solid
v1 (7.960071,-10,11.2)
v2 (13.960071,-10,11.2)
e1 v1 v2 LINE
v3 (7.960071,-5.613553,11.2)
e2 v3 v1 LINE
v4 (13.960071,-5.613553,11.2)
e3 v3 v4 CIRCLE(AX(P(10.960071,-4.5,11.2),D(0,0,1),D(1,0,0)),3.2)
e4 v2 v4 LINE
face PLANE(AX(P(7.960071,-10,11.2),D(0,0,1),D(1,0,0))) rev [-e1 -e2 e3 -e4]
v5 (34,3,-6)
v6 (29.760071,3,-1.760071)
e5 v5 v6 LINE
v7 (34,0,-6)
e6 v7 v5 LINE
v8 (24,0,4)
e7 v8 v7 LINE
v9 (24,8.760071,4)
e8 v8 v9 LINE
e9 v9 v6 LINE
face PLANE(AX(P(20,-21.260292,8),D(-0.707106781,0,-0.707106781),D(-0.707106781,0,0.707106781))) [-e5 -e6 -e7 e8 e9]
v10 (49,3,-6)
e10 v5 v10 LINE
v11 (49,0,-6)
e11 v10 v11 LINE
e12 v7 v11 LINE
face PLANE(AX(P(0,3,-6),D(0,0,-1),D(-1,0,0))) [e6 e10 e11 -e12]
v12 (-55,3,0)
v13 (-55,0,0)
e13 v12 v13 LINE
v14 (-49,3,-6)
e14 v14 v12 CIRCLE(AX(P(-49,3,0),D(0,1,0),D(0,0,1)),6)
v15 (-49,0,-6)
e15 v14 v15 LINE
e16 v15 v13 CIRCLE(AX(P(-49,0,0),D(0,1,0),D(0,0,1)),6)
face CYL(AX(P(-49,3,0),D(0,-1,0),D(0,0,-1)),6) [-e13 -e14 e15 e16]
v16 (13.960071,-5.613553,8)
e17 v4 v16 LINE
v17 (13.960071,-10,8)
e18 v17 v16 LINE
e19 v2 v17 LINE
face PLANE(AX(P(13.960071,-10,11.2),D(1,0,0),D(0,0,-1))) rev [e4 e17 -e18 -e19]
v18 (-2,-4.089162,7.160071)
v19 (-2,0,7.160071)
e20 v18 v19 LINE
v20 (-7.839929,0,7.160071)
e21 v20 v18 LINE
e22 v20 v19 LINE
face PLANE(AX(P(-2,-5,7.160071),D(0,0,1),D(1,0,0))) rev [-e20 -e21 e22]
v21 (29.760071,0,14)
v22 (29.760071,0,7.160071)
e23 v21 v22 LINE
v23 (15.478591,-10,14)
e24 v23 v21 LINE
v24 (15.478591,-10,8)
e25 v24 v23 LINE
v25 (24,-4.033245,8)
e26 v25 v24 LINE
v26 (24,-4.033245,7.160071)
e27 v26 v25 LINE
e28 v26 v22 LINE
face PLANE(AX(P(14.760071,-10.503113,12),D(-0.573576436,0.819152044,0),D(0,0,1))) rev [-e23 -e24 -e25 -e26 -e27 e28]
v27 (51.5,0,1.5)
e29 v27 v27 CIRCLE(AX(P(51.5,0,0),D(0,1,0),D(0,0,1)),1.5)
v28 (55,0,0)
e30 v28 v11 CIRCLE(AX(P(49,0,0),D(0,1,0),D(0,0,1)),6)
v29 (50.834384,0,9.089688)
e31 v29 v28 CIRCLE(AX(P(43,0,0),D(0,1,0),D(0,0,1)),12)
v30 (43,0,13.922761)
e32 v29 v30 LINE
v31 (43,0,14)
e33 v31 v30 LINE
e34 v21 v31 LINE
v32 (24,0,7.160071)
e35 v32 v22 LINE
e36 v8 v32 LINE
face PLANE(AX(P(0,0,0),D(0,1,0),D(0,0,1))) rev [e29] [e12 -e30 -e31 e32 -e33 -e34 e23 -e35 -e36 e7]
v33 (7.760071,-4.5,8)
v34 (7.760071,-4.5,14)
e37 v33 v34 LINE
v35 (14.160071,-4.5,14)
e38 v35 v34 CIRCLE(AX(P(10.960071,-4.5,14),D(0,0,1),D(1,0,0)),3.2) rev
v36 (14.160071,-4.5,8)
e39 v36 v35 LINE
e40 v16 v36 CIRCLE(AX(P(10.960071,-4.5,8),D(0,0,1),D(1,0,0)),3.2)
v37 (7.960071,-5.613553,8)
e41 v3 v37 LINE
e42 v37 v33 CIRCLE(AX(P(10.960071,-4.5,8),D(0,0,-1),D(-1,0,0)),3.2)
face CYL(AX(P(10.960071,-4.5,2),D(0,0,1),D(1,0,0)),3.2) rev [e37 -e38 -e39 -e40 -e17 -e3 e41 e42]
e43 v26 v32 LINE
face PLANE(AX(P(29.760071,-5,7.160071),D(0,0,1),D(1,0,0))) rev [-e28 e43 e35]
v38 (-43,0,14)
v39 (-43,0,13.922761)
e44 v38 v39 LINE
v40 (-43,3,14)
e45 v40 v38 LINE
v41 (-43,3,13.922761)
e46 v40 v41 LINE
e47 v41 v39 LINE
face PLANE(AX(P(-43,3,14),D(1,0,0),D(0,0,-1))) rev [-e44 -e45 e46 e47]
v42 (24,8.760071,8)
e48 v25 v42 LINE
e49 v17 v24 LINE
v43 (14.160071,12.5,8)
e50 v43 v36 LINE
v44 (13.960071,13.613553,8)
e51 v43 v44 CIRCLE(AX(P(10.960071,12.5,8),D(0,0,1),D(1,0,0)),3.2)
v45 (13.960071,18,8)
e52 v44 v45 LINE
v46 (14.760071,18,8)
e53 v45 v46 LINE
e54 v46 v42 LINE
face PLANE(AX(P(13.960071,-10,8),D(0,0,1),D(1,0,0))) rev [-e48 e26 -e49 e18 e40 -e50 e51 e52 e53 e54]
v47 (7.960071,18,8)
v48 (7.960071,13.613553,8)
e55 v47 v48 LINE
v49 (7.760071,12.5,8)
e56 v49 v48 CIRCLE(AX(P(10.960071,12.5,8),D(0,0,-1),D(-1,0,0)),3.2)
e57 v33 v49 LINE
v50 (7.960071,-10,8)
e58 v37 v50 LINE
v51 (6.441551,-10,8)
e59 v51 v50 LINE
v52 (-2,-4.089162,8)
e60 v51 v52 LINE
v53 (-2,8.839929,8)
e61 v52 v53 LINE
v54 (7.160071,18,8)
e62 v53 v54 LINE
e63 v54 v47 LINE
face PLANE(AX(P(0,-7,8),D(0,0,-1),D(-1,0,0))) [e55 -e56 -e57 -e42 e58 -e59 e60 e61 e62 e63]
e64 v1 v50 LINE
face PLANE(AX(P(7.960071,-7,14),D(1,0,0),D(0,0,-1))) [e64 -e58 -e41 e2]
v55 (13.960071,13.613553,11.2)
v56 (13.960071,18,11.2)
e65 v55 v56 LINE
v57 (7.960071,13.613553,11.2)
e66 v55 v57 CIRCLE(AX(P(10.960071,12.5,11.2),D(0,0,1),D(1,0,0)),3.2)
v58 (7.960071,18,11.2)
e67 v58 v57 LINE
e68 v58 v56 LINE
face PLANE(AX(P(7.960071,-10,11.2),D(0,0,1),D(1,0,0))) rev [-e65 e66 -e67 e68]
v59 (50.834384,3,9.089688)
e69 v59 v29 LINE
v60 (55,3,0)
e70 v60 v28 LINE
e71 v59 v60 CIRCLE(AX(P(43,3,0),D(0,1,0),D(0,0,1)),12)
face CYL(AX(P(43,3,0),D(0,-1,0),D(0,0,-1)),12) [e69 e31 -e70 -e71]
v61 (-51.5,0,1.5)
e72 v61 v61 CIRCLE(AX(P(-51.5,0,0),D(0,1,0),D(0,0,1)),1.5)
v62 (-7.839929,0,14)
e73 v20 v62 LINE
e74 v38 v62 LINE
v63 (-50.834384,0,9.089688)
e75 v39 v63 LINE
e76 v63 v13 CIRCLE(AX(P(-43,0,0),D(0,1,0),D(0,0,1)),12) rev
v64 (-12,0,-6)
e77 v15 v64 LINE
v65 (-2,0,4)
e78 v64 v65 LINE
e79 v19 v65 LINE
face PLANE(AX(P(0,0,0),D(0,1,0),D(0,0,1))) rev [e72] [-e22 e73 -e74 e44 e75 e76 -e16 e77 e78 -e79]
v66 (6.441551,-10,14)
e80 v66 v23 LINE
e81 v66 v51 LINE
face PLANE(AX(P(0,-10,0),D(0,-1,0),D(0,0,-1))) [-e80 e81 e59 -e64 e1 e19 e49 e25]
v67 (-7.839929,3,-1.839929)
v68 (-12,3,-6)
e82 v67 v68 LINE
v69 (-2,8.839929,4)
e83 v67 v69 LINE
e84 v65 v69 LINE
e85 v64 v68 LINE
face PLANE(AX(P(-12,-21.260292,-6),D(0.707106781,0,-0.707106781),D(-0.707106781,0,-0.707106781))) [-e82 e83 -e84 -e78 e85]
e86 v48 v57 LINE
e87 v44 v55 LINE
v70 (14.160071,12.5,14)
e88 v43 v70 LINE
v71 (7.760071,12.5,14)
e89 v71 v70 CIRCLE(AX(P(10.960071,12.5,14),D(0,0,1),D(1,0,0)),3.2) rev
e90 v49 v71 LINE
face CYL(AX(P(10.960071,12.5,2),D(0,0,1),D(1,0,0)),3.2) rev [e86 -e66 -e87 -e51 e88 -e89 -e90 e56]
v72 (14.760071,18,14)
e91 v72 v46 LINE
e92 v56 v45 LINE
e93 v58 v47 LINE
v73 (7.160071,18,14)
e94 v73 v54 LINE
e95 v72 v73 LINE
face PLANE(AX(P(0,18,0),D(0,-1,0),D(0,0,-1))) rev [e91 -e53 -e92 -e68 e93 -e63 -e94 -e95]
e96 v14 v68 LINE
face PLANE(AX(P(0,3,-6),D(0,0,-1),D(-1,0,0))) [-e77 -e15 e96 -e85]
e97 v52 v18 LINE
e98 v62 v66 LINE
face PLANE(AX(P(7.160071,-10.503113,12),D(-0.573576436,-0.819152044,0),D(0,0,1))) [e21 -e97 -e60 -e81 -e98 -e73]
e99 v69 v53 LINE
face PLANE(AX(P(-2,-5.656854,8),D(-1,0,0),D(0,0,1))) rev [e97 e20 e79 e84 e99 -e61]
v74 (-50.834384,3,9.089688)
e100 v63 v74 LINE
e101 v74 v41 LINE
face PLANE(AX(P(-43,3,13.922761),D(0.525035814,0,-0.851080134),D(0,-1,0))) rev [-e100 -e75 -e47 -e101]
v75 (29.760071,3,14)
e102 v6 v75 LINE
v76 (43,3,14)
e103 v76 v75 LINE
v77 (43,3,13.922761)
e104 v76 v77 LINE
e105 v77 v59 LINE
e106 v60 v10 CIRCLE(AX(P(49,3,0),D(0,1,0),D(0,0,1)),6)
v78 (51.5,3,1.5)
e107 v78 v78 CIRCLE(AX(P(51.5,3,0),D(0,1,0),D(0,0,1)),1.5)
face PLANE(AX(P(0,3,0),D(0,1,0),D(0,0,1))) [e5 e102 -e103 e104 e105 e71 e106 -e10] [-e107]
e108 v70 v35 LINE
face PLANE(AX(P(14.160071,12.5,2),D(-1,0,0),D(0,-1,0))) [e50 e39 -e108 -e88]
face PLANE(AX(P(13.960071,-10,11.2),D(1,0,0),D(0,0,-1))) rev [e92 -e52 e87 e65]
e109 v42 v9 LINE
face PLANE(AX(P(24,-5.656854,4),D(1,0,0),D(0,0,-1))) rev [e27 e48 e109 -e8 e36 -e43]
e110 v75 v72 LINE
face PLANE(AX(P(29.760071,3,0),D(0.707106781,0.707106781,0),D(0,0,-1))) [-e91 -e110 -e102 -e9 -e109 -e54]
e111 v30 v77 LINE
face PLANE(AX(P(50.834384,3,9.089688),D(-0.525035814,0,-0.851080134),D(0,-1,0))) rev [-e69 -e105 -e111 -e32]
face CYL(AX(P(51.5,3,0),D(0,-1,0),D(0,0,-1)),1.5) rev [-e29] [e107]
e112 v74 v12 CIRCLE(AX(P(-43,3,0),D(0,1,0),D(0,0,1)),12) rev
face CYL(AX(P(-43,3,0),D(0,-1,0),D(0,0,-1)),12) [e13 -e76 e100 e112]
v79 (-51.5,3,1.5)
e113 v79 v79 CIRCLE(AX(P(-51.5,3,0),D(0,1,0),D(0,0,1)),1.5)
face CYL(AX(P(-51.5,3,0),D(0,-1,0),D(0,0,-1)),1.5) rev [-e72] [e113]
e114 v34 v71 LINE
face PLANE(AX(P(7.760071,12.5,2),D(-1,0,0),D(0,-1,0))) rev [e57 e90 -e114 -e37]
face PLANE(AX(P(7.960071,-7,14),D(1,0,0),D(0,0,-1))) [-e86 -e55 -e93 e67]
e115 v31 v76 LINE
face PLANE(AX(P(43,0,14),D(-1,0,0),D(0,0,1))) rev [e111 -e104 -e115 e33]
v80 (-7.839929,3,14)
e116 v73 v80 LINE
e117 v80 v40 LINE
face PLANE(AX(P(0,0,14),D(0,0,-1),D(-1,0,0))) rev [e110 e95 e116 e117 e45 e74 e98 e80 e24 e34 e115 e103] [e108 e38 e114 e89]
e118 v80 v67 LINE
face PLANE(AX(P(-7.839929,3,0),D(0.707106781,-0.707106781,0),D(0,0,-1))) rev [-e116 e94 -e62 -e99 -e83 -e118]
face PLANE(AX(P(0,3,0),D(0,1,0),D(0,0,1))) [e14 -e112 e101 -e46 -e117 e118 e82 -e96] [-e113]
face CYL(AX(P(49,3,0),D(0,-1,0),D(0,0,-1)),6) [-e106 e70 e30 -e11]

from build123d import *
from build123d.topology import SkipClean

# Parameters (mm, degrees)
BOSS_EXTRUDE1_DEPTH = 3
CUT_EXTRUDE1_DEPTH  = 10
CUT_EXTRUDE3_START  = 8
SKETCH8_W           = 6
SKETCH8_H           = 3
CUT_EXTRUDE3_DEPTH  = 6
BOSS_EXTRUDE4_START = 18
BOSS_EXTRUDE4_DEPTH = 28
BOSS_EXTRUDE5_DEPTH = 3
CUT_EXTRUDE4_DEPTH  = 3
CHAMFER1_SIZE       = 15
CHAMFER2_SIZE       = 15
CHAMFER2_SIZE_2     = 10.503113073
CUT_EXTRUDE5_DEPTH  = 10
CUT_EXTRUDE6_DEPTH  = 5
BOSS_EXTRUDE8_DEPTH = 2
CHAMFER3_DEPTH      = 4
CHAMFER3_2_DEPTH    = 3


with BuildPart() as part:
    # Sketch1 → Boss-Extrude1 (new body)
    with BuildSketch(Plane(origin=(0, 0, 0), x_dir=(1, 0, 0), z_dir=(0, 1, 0))):
        with BuildLine():
            ThreePointArc((-49, -6), (-53.242640687, -4.242640687), (-55, 0))
            ThreePointArc((-55, 0), (-51.485281374, -8.485281374), (-43, -12))
            Line((-43, -12), (43, -12))
            ThreePointArc((43, -12), (51.485281374, -8.485281374), (55, 0))
            ThreePointArc((55, 0), (53.242640687, -4.242640687), (49, -6))
            Line((49, -6), (-49, -6))
        make_face()
        with BuildLine():
            Line((-53, 0), (-55, 0))
            ThreePointArc((-55, 0), (-53.242640687, -4.242640687), (-49, -6))
            Line((-49, -6), (49, -6))
            ThreePointArc((49, -6), (53.242640687, -4.242640687), (55, 0))
            Line((55, 0), (53, 0))
            ThreePointArc((53, 0), (51.5, -1.5), (50, 0))
            Line((50, 0), (-50, 0))
            ThreePointArc((-50, 0), (-51.5, -1.5), (-53, 0))
        make_face()
        with BuildLine():
            Line((49, 6), (-49, 6))
            ThreePointArc((-49, 6), (-53.242640687, 4.242640687), (-55, 0))
            Line((-55, 0), (-53, 0))
            ThreePointArc((-53, 0), (-51.5, 1.5), (-50, 0))
            Line((-50, 0), (50, 0))
            ThreePointArc((50, 0), (51.5, 1.5), (53, 0))
            Line((53, 0), (55, 0))
            ThreePointArc((55, 0), (53.242640687, 4.242640687), (49, 6))
        make_face()
    extrude(amount=BOSS_EXTRUDE1_DEPTH)

    # Sketch2 → Cut-Extrude1 (cut)
    with BuildSketch(Plane(origin=(0, 3, 0), x_dir=(1, 0, 0), z_dir=(0, 1, 0))):
        Polygon((22, -8), (36, 6), (-14, 6), (0, -8), align=None)
    extrude(amount=-CUT_EXTRUDE1_DEPTH, mode=Mode.SUBTRACT)

    # Sketch8 → Cut-Extrude3 (cut)
    with BuildSketch(Plane.XY.offset(CUT_EXTRUDE3_START)):
        with Locations((10.960071178, 1.5)):
            Rectangle(SKETCH8_W, SKETCH8_H)
    extrude(amount=CUT_EXTRUDE3_DEPTH, mode=Mode.SUBTRACT)


with BuildPart() as cut_extrude3_piece_1:
    # of the separate pieces the step leaves, piece 1, a body of its own (cut_extrude3_pieces)
    add(part.part.solids().sort_by_distance((-55, 0, 0))[0])

    # Sketch9 → Boss-Extrude4 (add)
    with BuildSketch(Plane(origin=(0, 0, 0), x_dir=(1, 0, 0), z_dir=(0, 1, 0)).offset(BOSS_EXTRUDE4_START)):
        Polygon((13.960071178, -11.2), (13.960071178, -8), (14.760071178, -8), (14.760071178, -12), (7.160071178, -12), (7.160071178, -8), (7.960071178, -8), (7.960071178, -11.2), align=None)
    extrude(amount=-BOSS_EXTRUDE4_DEPTH)


with BuildPart() as cut_extrude3_piece_2:
    # of the separate pieces the step leaves, piece 2, a body of its own (cut_extrude3_pieces)
    add(part.part.solids().sort_by_distance((13.960071178, 0, 12))[0])


with BuildPart() as cut_extrude3_piece_1_1:
    add(cut_extrude3_piece_1.part)

    # Combine1: union Cut-Extrude3 piece 2
    add(cut_extrude3_piece_2.part)

    # Sketch11 → Boss-Extrude5 (add)
    with BuildSketch(Plane(origin=(0, 3, 0), x_dir=(1, 0, 0), z_dir=(0, 1, 0))):
        Polygon((-14, 6), (-12, 6), (2, -8), (0, -8), align=None)
        Polygon((20, -8), (34, 6), (36, 6), (22, -8), align=None)
    extrude(amount=-BOSS_EXTRUDE5_DEPTH)

    # Sketch13 → Cut-Extrude4 (cut)
    with BuildSketch(Plane(origin=(0, 3, 0), x_dir=(1, 0, 0), z_dir=(0, 1, 0))):
        Polygon((2, -8), (-2, -8), (-2, -4), align=None)
        Polygon((24, -4), (24, -8), (20, -8), align=None)
    extrude(amount=-CUT_EXTRUDE4_DEPTH, mode=Mode.SUBTRACT)

    # Chamfer1
    chamfer1_edges = [cut_extrude3_piece_1_1.edges().sort_by_distance(p)[0] for p in [
        (14.760071178, 3, 10),
        (7.160071178, 3, 10),
    ]]
    chamfer(chamfer1_edges, length=CHAMFER1_SIZE - 0.0001)  # a hair under: the kernel refuses the full size

    # Chamfer2
    # the kernel refuses this chamfer: 15, 10.503113073 mm, written as the material it adds along each edge
    with BuildSketch(Plane(origin=(7.160071178, 0, 12), x_dir=(-1, 0, 0), z_dir=(0, 0, -1))) as chamfer2_piece_1_section:
        Polygon((CHAMFER2_SIZE, 0), (0, -CHAMFER2_SIZE_2), (0, 0), align=None)
    chamfer2_piece_1 = extrude(amount=4, mode=Mode.PRIVATE)
    chamfer2_piece_1 = split(chamfer2_piece_1, bisect_by=Plane(origin=(-2, 0, 12), z_dir=(-1, 0, 0)), keep=Keep.TOP, mode=Mode.PRIVATE)
    add(chamfer2_piece_1)
    with BuildSketch(Plane(origin=(7.160071178, 0, 12), x_dir=(-1, 0, 0), z_dir=(0, 0, -1))) as chamfer2_piece_2_section:
        Polygon((CHAMFER2_SIZE, 0), (0, -CHAMFER2_SIZE_2), (0, 0), align=None)
    chamfer2_piece_2 = extrude(amount=4, mode=Mode.PRIVATE)
    chamfer2_piece_2 = split(chamfer2_piece_2, bisect_by=Plane(origin=(6.580035589, 0, 12.580035589), z_dir=(-0.7071067811865489, 0, 0.7071067811865461)), keep=Keep.TOP, mode=Mode.PRIVATE)
    chamfer2_piece_2 = split(chamfer2_piece_2, bisect_by=Plane(origin=(-2, 0, 12), z_dir=(1, 0, 0)), keep=Keep.TOP, mode=Mode.PRIVATE)
    add(chamfer2_piece_2)
    with BuildSketch(Plane(origin=(7.160071178, 0, 12), x_dir=(-1, 0, 0), z_dir=(0, 0, -1))) as chamfer2_piece_3_section:
        Polygon((CHAMFER2_SIZE, 0), (0, -CHAMFER2_SIZE_2), (0, 0), align=None)
    chamfer2_piece_3 = extrude(amount=42.738283454, mode=Mode.PRIVATE)
    chamfer2_piece_3 = split(chamfer2_piece_3, bisect_by=Plane(origin=(6.580035589, 0, 12.580035589), z_dir=(-0.7071067811865489, 0, 0.7071067811865461)), keep=Keep.TOP, mode=Mode.PRIVATE)
    chamfer2_piece_3 = split(chamfer2_piece_3, bisect_by=Plane(origin=(-2, 0, 12), z_dir=(-1, 0, 0)), keep=Keep.TOP, mode=Mode.PRIVATE)
    chamfer2_piece_3 = split(chamfer2_piece_3, bisect_by=Plane(origin=(7.160071178, 0, 8), z_dir=(0, 0, -1)), keep=Keep.TOP, mode=Mode.PRIVATE)
    add(chamfer2_piece_3)
    with BuildSketch(Plane(origin=(7.160071178, 0, 12), x_dir=(-1, 0, 0), z_dir=(0, 0, -1))) as chamfer2_piece_4_section:
        Polygon((CHAMFER2_SIZE, 0), (0, -CHAMFER2_SIZE_2), (0, 0), align=None)
    chamfer2_piece_4 = extrude(amount=4, mode=Mode.PRIVATE)
    chamfer2_piece_4 = split(chamfer2_piece_4, bisect_by=Plane(origin=(6.580035589, 0, 12.580035589), z_dir=(0.7071067811865489, 0, -0.7071067811865461)), keep=Keep.TOP, mode=Mode.PRIVATE)
    chamfer2_piece_4 = split(chamfer2_piece_4, bisect_by=Plane(origin=(7.160071178, -10, 12), z_dir=(0, 1, 0)), keep=Keep.TOP, mode=Mode.PRIVATE)
    add(chamfer2_piece_4)
    with BuildSketch(Plane(origin=(14.760071178, 0, 12), x_dir=(0, -1, 0), z_dir=(0, 0, -1))) as chamfer2_piece_5_section:
        Polygon((CHAMFER2_SIZE_2, 0), (0, -CHAMFER2_SIZE), (0, 0), align=None)
    chamfer2_piece_5 = extrude(amount=4, mode=Mode.PRIVATE)
    chamfer2_piece_5 = split(chamfer2_piece_5, bisect_by=Plane(origin=(15.380035589, 0, 12.619964411), z_dir=(0.7071067811865462, 0, 0.7071067811865489)), keep=Keep.TOP, mode=Mode.PRIVATE)
    chamfer2_piece_5 = split(chamfer2_piece_5, bisect_by=Plane(origin=(24, 0, 12), z_dir=(-1, 0, 0)), keep=Keep.TOP, mode=Mode.PRIVATE)
    add(chamfer2_piece_5)
    with BuildSketch(Plane(origin=(14.760071178, 0, 12), x_dir=(0, -1, 0), z_dir=(0, 0, -1))) as chamfer2_piece_6_section:
        Polygon((CHAMFER2_SIZE_2, 0), (0, -CHAMFER2_SIZE), (0, 0), align=None)
    chamfer2_piece_6 = extrude(amount=4, mode=Mode.PRIVATE)
    chamfer2_piece_6 = split(chamfer2_piece_6, bisect_by=Plane(origin=(24, 0, 12), z_dir=(1, 0, 0)), keep=Keep.TOP, mode=Mode.PRIVATE)
    add(chamfer2_piece_6)
    with BuildSketch(Plane(origin=(14.760071178, 0, 12), x_dir=(0, -1, 0), z_dir=(0, 0, -1))) as chamfer2_piece_7_section:
        Polygon((CHAMFER2_SIZE_2, 0), (0, -CHAMFER2_SIZE), (0, 0), align=None)
    chamfer2_piece_7 = extrude(amount=4, mode=Mode.PRIVATE)
    chamfer2_piece_7 = split(chamfer2_piece_7, bisect_by=Plane(origin=(14.760071178, -10, 12), z_dir=(0, 1, 0)), keep=Keep.TOP, mode=Mode.PRIVATE)
    chamfer2_piece_7 = split(chamfer2_piece_7, bisect_by=Plane(origin=(15.380035589, 0, 12.619964411), z_dir=(-0.7071067811865462, 0, -0.7071067811865489)), keep=Keep.TOP, mode=Mode.PRIVATE)
    add(chamfer2_piece_7)
    with BuildSketch(Plane(origin=(14.760071178, 0, 12), x_dir=(0, -1, 0), z_dir=(0, 0, -1))) as chamfer2_piece_8_section:
        Polygon((CHAMFER2_SIZE_2, 0), (0, -CHAMFER2_SIZE), (0, 0), align=None)
    chamfer2_piece_8 = extrude(amount=42.738283454, mode=Mode.PRIVATE)
    chamfer2_piece_8 = split(chamfer2_piece_8, bisect_by=Plane(origin=(14.760071178, 0, 8), z_dir=(0, 0, -1)), keep=Keep.TOP, mode=Mode.PRIVATE)
    chamfer2_piece_8 = split(chamfer2_piece_8, bisect_by=Plane(origin=(15.380035589, 0, 12.619964411), z_dir=(0.7071067811865462, 0, 0.7071067811865489)), keep=Keep.TOP, mode=Mode.PRIVATE)
    chamfer2_piece_8 = split(chamfer2_piece_8, bisect_by=Plane(origin=(24, 0, 12), z_dir=(1, 0, 0)), keep=Keep.TOP, mode=Mode.PRIVATE)
    add(chamfer2_piece_8)

    # Sketch15 → Cut-Extrude5 (cut)
    with BuildSketch(Plane.XY.offset(12)):
        with BuildLine():
            Line((14.160071178, 12.5), (14.160071178, -4.5))
            ThreePointArc((14.160071178, -4.5), (10.960071178, -7.7), (7.760071178, -4.5))
            Line((7.760071178, -4.5), (7.760071178, 12.5))
            ThreePointArc((7.760071178, 12.5), (10.960071178, 15.7), (14.160071178, 12.5))
        make_face()
    extrude(amount=-CUT_EXTRUDE5_DEPTH, mode=Mode.SUBTRACT)

    # Sketch16 → Cut-Extrude6 (cut)
    with BuildSketch(Plane(origin=(0, 0, 0), x_dir=(1, 0, 0), z_dir=(0, 1, 0))):
        Polygon((-7.839928822, 1.839928822), (-2, -4), (-2, -7.160071178), (-7.839928822, -7.160071178), align=None)
        Polygon((24, -7.160071178), (24, -4), (29.760071178, 1.760071178), (29.760071178, -7.160071178), align=None)
    extrude(amount=-CUT_EXTRUDE6_DEPTH, mode=Mode.SUBTRACT)

    # Sketch17 → Boss-Extrude8 (add)
    with SkipClean():  # the faces are left unmerged after this step: merging them gives an invalid solid
        with BuildSketch(Plane.XY.offset(12)):
            Polygon((-7.839928822, 0), (6.441551245, -10), (15.47859111, -10), (29.760071178, 0), (43, 0), (43, 3), (29.760071178, 3), (14.760071178, 18), (7.160071178, 18), (-7.839928822, 3), (-43, 3), (-43, 0), align=None)
            with BuildLine():
                Line((7.760071178, -4.5), (7.760071178, 12.5))
                ThreePointArc((7.760071178, 12.5), (10.960071178, 15.7), (14.160071178, 12.5))
                Line((14.160071178, 12.5), (14.160071178, -4.5))
                ThreePointArc((14.160071178, -4.5), (10.960071178, -7.7), (7.760071178, -4.5))
            make_face(mode=Mode.SUBTRACT)
        extrude(amount=BOSS_EXTRUDE8_DEPTH)

    # Chamfer3: read off the stored shape, not the designer's step
    # Chamfer3 outline → Chamfer3 (cut)
    with SkipClean():  # the faces are left unmerged after this step: merging them gives an invalid solid
        with BuildSketch(Plane(origin=(0, 0, 0), x_dir=(1, 0, 0), z_dir=(0, 1, 0))):
            with BuildLine():
                ThreePointArc((47.608318931, -11.079864468), (49.300429772, -10.212961602), (50.834384089, -9.08968789))
                Line((50.834384089, -9.08968789), (47.608318931, -11.079864468))
            make_face()
            with BuildLine():
                ThreePointArc((-50.834384089, -9.08968789), (-49.300429772, -10.212961602), (-47.608318931, -11.079864468))
                Line((-47.608318931, -11.079864468), (-50.834384089, -9.08968789))
            make_face()
        extrude(amount=CHAMFER3_DEPTH, mode=Mode.SUBTRACT)

    # Chamfer3 2 outline → Chamfer3 2 (add)
    with SkipClean():  # the faces are left unmerged after this step: merging them gives an invalid solid
        with BuildSketch(Plane(origin=(0, 0, 0), x_dir=(1, 0, 0), z_dir=(0, 1, 0))):
            with BuildLine():
                Line((43, -13.922760673), (47.608318931, -11.079864468))
                ThreePointArc((47.608318931, -11.079864468), (45.349641077, -11.767717995), (43, -12))
                Line((43, -12), (43, -13.922760673))
            make_face()
            with BuildLine():
                Line((-47.608318931, -11.079864468), (-43, -13.922760673))
                Line((-43, -13.922760673), (-43, -12))
                ThreePointArc((-43, -12), (-45.349641077, -11.767717995), (-47.608318931, -11.079864468))
            make_face()
        extrude(amount=CHAMFER3_2_DEPTH)


solid = cut_extrude3_piece_1_1.part
